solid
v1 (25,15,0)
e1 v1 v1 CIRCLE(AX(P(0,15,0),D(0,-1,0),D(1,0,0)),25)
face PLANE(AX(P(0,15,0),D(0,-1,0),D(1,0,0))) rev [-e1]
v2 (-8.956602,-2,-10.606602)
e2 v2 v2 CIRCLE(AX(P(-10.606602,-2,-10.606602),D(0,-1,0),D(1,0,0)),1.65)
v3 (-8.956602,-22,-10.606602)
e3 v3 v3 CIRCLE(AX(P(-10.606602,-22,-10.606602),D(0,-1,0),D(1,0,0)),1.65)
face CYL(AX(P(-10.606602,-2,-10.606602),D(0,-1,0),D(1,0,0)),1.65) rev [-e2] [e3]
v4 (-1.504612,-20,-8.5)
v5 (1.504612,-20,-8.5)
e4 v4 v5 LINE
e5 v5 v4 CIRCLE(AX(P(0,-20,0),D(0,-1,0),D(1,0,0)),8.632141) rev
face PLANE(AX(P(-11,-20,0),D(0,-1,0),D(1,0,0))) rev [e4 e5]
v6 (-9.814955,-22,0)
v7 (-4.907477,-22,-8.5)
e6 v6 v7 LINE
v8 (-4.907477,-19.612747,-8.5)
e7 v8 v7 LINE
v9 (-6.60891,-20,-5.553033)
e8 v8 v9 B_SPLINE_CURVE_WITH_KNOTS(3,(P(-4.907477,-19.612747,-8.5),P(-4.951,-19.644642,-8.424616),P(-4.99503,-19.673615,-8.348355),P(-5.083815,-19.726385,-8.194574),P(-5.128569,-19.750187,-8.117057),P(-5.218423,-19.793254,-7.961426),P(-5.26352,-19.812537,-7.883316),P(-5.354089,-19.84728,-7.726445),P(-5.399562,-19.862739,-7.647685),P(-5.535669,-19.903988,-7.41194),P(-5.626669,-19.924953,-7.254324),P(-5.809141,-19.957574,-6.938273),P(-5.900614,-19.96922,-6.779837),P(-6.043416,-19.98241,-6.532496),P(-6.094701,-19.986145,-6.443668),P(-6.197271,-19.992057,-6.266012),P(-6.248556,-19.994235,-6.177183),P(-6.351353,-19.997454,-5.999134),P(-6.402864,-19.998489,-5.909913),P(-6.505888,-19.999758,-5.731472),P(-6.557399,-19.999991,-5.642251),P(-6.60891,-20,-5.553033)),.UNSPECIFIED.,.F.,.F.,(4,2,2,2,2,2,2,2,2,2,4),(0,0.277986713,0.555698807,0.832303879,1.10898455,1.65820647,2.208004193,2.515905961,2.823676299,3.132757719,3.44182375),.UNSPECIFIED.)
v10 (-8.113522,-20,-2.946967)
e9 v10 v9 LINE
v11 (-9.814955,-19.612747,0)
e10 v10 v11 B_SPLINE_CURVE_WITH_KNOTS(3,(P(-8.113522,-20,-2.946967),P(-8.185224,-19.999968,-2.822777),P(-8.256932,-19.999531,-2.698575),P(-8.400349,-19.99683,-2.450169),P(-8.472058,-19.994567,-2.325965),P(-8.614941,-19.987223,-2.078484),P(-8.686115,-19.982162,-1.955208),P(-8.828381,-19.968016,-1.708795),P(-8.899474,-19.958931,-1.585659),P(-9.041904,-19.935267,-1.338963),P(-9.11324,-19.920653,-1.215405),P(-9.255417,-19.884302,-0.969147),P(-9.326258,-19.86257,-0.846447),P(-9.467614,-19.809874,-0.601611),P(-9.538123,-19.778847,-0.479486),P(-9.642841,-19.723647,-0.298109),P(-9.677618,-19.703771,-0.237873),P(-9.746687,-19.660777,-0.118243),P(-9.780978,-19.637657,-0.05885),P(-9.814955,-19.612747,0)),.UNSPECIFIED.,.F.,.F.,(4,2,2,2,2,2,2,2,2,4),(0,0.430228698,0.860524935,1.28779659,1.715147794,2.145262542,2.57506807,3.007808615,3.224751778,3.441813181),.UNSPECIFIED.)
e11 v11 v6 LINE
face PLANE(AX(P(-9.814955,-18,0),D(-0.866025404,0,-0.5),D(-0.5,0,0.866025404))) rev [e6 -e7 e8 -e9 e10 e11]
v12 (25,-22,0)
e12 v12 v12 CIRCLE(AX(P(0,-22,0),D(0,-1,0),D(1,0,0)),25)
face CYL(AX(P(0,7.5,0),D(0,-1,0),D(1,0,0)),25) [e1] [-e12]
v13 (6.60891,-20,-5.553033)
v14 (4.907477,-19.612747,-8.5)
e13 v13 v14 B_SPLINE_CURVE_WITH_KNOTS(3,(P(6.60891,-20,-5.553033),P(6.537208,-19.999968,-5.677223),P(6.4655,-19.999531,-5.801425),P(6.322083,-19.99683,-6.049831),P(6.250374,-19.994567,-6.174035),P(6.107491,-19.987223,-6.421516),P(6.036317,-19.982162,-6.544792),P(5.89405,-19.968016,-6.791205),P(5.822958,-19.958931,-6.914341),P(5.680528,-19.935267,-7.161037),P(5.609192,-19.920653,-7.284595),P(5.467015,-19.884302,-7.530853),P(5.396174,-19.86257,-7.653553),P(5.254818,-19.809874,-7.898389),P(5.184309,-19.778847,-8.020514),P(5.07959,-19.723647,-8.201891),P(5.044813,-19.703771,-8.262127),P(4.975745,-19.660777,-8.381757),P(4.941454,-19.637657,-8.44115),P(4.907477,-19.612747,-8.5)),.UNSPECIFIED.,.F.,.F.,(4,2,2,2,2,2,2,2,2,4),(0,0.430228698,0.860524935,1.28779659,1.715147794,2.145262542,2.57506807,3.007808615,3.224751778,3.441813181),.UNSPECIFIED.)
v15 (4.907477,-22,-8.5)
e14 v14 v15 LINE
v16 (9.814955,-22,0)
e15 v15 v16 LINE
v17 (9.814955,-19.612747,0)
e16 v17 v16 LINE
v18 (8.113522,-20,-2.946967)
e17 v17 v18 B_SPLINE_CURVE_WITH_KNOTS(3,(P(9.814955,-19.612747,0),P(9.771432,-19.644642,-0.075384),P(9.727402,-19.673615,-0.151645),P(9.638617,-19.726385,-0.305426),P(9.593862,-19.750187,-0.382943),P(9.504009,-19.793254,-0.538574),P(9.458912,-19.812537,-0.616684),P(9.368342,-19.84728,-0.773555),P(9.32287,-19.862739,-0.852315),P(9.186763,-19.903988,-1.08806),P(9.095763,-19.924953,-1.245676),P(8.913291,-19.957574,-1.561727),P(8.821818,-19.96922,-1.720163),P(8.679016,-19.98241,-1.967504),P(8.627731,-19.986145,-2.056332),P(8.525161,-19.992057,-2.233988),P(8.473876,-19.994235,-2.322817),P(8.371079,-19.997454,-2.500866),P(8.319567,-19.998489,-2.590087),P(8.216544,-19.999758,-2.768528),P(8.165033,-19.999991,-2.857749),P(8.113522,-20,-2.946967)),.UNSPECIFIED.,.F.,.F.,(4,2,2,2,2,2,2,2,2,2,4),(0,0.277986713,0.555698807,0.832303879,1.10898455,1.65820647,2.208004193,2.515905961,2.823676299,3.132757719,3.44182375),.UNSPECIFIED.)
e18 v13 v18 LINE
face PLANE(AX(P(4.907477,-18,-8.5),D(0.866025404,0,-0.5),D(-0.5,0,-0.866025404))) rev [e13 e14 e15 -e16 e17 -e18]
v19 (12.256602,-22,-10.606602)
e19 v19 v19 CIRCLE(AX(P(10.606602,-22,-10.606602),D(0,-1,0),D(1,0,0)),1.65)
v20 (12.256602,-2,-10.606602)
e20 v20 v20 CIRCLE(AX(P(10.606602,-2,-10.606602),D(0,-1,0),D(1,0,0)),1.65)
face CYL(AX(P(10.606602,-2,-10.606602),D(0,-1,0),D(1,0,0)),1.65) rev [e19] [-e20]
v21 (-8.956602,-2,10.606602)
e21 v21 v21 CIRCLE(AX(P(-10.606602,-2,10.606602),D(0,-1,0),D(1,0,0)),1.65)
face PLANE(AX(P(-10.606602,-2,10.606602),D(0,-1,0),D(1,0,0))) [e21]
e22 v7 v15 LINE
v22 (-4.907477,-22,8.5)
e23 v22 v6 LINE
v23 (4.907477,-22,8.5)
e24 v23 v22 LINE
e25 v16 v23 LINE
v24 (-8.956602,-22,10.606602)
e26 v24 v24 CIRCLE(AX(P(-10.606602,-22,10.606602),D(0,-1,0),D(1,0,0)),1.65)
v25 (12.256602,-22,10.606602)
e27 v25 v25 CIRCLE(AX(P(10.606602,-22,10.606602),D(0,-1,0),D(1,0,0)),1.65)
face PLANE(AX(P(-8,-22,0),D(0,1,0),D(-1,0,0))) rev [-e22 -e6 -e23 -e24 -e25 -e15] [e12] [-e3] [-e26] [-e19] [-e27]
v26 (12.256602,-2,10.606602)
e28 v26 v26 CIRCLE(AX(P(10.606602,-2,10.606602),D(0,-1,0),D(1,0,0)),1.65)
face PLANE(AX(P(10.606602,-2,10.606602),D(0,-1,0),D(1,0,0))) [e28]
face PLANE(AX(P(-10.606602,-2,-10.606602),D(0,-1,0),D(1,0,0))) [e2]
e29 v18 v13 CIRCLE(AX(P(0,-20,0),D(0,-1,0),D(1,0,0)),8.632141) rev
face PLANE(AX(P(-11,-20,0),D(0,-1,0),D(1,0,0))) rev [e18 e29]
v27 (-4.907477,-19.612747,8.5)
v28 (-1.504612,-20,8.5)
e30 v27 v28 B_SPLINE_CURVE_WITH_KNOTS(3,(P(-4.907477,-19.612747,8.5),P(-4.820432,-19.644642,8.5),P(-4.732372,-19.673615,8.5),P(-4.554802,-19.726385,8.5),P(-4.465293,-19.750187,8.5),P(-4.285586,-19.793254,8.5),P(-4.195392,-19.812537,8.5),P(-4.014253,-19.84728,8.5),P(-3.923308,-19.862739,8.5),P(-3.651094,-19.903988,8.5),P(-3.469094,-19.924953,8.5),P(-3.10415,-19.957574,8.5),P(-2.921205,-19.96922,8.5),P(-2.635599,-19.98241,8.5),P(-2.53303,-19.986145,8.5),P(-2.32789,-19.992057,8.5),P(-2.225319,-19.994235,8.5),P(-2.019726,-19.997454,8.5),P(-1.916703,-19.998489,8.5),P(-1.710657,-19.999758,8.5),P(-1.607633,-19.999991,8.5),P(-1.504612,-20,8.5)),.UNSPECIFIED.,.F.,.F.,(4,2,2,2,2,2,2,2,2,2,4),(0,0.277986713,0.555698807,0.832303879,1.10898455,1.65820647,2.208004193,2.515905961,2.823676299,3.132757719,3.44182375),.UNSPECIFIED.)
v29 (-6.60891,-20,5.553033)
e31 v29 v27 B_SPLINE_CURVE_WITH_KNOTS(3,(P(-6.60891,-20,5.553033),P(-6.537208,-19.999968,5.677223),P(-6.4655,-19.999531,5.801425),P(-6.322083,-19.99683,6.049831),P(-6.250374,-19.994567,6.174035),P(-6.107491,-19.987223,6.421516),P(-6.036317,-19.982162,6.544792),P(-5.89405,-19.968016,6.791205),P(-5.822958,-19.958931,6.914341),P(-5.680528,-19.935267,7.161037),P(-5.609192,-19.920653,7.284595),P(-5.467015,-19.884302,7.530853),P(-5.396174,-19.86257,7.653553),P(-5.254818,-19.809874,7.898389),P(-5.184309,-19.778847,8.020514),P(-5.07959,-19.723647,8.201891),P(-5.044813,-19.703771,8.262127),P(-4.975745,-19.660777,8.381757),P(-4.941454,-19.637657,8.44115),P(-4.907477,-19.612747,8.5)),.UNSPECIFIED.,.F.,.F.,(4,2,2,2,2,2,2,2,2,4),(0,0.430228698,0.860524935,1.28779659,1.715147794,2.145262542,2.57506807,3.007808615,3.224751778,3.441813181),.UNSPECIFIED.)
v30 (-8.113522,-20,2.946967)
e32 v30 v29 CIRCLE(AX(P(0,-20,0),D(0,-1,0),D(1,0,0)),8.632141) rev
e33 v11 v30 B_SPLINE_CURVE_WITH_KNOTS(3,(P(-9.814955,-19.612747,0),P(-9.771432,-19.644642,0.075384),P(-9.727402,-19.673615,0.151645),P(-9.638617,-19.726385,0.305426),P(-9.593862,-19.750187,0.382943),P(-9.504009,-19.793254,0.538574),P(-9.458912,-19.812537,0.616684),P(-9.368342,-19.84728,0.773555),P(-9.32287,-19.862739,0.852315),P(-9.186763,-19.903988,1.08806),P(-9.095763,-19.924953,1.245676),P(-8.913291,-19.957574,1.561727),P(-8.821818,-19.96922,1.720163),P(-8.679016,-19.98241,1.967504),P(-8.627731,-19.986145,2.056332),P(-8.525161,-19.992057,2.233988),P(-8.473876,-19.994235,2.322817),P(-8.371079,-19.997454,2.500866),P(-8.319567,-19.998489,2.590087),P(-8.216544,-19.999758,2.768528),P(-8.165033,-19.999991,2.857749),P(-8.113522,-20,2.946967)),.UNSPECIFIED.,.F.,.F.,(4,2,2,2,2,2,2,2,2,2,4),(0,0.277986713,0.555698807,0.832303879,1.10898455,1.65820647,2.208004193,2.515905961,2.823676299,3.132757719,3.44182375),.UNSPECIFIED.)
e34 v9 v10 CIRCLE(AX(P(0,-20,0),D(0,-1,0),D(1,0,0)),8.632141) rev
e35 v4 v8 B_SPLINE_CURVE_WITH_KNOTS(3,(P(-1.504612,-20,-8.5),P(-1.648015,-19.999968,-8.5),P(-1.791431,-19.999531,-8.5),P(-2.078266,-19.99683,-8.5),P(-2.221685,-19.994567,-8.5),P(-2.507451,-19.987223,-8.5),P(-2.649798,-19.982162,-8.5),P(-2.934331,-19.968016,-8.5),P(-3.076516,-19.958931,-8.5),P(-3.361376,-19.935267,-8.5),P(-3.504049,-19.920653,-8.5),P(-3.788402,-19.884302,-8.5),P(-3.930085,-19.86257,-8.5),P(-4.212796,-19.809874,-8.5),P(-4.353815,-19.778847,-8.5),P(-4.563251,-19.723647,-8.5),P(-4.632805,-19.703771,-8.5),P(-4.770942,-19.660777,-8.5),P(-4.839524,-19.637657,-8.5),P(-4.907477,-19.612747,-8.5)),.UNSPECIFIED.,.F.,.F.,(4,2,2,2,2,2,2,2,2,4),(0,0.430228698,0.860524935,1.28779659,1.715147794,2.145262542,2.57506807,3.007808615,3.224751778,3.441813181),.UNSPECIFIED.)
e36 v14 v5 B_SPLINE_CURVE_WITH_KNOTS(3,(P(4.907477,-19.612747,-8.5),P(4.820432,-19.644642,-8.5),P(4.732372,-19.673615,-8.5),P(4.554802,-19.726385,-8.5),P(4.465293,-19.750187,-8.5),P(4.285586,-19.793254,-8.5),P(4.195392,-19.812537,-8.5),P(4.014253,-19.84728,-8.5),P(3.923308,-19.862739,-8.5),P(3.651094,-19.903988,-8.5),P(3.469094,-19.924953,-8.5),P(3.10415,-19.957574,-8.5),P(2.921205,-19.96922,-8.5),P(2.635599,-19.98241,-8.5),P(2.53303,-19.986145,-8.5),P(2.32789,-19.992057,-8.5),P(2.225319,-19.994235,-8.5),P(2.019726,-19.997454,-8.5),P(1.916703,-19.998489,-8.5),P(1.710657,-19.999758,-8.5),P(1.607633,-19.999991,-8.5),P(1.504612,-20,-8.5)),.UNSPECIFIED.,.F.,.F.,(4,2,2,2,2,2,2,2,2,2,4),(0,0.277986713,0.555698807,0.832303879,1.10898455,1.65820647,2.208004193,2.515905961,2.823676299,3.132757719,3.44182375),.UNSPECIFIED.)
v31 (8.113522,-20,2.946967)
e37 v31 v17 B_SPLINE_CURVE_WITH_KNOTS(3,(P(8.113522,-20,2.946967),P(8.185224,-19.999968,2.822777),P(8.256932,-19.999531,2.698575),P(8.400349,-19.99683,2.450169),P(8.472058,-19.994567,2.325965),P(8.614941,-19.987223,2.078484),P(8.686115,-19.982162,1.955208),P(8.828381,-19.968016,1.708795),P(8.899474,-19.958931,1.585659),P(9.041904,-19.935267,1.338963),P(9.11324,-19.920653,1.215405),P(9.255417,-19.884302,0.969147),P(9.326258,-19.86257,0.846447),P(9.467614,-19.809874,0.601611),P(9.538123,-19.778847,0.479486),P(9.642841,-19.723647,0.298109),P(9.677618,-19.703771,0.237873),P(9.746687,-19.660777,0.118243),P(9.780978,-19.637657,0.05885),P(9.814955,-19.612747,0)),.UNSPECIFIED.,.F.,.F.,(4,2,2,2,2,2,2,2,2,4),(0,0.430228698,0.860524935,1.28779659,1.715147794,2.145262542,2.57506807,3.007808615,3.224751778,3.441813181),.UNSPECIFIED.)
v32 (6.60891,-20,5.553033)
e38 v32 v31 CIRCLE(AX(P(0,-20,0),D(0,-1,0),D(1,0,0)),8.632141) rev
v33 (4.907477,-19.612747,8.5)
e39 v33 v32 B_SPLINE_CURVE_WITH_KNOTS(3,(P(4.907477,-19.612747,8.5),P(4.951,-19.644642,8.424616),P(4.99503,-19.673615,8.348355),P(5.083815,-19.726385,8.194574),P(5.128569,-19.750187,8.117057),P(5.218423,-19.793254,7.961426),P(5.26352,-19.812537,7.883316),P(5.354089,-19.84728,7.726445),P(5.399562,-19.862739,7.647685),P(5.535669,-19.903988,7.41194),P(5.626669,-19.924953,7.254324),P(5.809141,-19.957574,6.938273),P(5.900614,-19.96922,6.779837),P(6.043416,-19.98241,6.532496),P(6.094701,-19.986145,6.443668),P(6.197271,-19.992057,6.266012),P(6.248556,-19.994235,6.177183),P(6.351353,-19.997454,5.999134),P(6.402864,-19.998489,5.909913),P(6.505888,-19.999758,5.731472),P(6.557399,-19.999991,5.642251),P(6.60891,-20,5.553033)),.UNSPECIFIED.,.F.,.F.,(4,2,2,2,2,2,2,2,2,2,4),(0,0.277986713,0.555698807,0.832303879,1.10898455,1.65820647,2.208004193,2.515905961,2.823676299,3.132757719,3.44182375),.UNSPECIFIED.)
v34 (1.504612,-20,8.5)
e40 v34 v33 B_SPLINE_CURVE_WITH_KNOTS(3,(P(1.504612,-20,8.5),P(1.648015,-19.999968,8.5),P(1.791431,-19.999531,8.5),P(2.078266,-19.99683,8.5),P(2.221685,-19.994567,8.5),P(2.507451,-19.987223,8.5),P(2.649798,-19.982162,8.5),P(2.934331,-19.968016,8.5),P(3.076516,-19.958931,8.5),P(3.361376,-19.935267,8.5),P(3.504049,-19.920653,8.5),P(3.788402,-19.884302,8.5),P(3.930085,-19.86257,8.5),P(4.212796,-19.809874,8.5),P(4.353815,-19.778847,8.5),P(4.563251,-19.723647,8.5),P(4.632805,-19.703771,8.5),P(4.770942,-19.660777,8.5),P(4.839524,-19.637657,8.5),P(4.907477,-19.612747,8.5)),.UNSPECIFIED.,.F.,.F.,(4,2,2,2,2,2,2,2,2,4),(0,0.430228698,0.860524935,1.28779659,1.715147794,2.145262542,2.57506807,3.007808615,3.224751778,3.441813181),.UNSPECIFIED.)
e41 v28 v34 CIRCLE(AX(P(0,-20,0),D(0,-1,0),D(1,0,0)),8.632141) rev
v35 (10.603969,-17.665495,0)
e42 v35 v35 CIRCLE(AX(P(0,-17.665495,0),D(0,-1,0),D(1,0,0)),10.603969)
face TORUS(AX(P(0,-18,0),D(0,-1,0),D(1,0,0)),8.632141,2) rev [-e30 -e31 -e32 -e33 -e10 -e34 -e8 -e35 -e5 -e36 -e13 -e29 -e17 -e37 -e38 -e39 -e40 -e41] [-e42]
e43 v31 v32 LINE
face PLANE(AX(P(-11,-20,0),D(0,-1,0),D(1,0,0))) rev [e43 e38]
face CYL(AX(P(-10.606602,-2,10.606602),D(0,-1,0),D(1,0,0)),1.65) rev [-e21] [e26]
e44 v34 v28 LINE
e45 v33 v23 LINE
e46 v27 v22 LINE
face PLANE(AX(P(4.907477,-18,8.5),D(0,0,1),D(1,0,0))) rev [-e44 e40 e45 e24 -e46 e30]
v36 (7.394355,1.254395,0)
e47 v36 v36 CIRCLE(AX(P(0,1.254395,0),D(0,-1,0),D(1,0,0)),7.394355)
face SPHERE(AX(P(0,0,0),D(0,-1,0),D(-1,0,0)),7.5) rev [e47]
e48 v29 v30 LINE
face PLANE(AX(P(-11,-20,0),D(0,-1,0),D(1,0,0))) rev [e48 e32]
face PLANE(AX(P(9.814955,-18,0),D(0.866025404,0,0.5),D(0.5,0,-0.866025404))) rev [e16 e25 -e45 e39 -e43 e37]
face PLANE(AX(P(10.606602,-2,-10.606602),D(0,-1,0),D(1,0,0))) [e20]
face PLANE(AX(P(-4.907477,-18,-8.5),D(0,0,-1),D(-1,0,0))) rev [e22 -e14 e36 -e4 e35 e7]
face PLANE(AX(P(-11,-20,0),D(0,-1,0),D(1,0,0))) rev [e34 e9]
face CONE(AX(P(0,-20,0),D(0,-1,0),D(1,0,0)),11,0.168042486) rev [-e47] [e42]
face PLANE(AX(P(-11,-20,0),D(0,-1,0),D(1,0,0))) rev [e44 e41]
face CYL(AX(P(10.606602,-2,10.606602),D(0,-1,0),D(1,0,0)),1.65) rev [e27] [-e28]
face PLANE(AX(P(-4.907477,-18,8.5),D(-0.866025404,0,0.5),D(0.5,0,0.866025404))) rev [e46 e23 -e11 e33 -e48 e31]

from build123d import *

# Parameters (mm, degrees)
ENL_V_MAT_EXTRU_1_DEPTH = 4
CONG_1_R                = 2
ESQUISSE3_R             = 1.65
ENL_V_MAT_EXTRU_2_DEPTH = 20


with BuildPart() as part:
    # Esquisse1 → Révolution2 (revolve)
    with BuildSketch(Plane.XY, mode=Mode.PRIVATE) as r_volution2_sk:
        with BuildLine():
            Line((-7.394355414, 1.254395478), (-11, -20))
            Line((-11, -20), (-8, -20))
            Line((-8, -20), (-8, -22))
            Line((-8, -22), (-25, -22))
            Line((-25, -22), (-25, -20))
            Line((-25, -20), (-25, 15))
            Line((-25, 15), (0, 15))
            Line((0, 15), (0, 7.5))
            ThreePointArc((0, 7.5), (-4.839526522, 5.729658196), (-7.394355414, 1.254395478))
        make_face()
    revolve(r_volution2_sk.sketch.rotate(Axis((0, 7.5, 0), (0, 1, 0)), 180), axis=Axis((0, 7.5, 0), (0, 1, 0)))

    # Esquisse2 → Enlèv. mat.-Extru.1 (cut)
    with BuildSketch(Plane.XZ.offset(22)):
        Polygon((9.814954576, 0), (4.907477288, 8.5), (-4.907477288, 8.5), (-9.814954576, 0), (-4.907477288, -8.5), (4.907477288, -8.5), align=None)
    extrude(amount=-ENL_V_MAT_EXTRU_1_DEPTH, mode=Mode.SUBTRACT)

    # Congé1
    # the kernel refuses this fillet: 2 mm, written as the material it adds along each edge
    with BuildSketch(Plane(origin=(0, -20, 0), x_dir=(1, 0, 0), z_dir=(0, 0, 1))) as cong_1_piece_1_section:
        with BuildLine():
            CenterArc((11 - CONG_1_R * 1.1839294959, CONG_1_R), CONG_1_R, 270, 99.628125236)
            Line((11 - CONG_1_R * 1.1839294959, 0), (11, 0))
            Line((11, 0), (11 - CONG_1_R * 0.198015440727, CONG_1_R * 1.16725273035))
        make_face()
    cong_1_piece_1 = revolve(axis=Axis((0, -20, 0), (0, 1, 0)), mode=Mode.PRIVATE)
    cong_1_piece_1 = split(cong_1_piece_1, bisect_by=Plane(origin=(10.002736097, -19.349469748, 0.325247134), z_dir=(0.8660254037844389, 0, -0.49999999999999956)), keep=Keep.TOP, mode=Mode.PRIVATE)
    with BuildSketch(Plane(origin=(0, -20, 0), x_dir=(1, 0, 0), z_dir=(0, 0, 1))) as cong_1_piece_2_section:
        with BuildLine():
            CenterArc((11 - CONG_1_R * 1.1839294959, CONG_1_R), CONG_1_R, 270, 99.628125236)
            Line((11 - CONG_1_R * 1.1839294959, 0), (11, 0))
            Line((11, 0), (11 - CONG_1_R * 0.198015440727, CONG_1_R * 1.16725273035))
        make_face()
    cong_1_piece_2 = revolve(axis=Axis((0, -20, 0), (0, 1, 0)), mode=Mode.PRIVATE)
    cong_1_piece_2 = split(cong_1_piece_2, bisect_by=Plane(origin=(7.361215688, -19.472047685, 4.250000423), z_dir=(0.8660254037844387, 0, 0.5000000000000003)), keep=Keep.TOP, mode=Mode.PRIVATE)
    with BuildSketch(Plane(origin=(0, -20, 0), x_dir=(1, 0, 0), z_dir=(0, 0, 1))) as cong_1_piece_3_section:
        with BuildLine():
            CenterArc((11 - CONG_1_R * 1.1839294959, CONG_1_R), CONG_1_R, 270, 99.628125236)
            Line((11 - CONG_1_R * 1.1839294959, 0), (11, 0))
            Line((11, 0), (11 - CONG_1_R * 0.198015440727, CONG_1_R * 1.16725273035))
        make_face()
    cong_1_piece_3 = revolve(axis=Axis((0, -20, 0), (0, 1, 0)), mode=Mode.PRIVATE)
    cong_1_piece_3 = split(cong_1_piece_3, bisect_by=Plane(origin=(-2.9e-08, -19.472047136, -8.5), z_dir=(0, 0, -1)), keep=Keep.TOP, mode=Mode.PRIVATE)
    with BuildSketch(Plane(origin=(0, -20, 0), x_dir=(1, 0, 0), z_dir=(0, 0, 1))) as cong_1_piece_4_section:
        with BuildLine():
            CenterArc((11 - CONG_1_R * 1.1839294959, CONG_1_R), CONG_1_R, 270, 99.628125236)
            Line((11 - CONG_1_R * 1.1839294959, 0), (11, 0))
            Line((11, 0), (11 - CONG_1_R * 0.198015440727, CONG_1_R * 1.16725273035))
        make_face()
    cong_1_piece_4 = revolve(axis=Axis((0, -20, 0), (0, 1, 0)), mode=Mode.PRIVATE)
    cong_1_piece_4 = split(cong_1_piece_4, bisect_by=Plane(origin=(2.9e-08, -19.472047136, 8.5), z_dir=(0, 0, 1)), keep=Keep.TOP, mode=Mode.PRIVATE)
    with BuildSketch(Plane(origin=(0, -20, 0), x_dir=(1, 0, 0), z_dir=(0, 0, 1))) as cong_1_piece_5_section:
        with BuildLine():
            CenterArc((11 - CONG_1_R * 1.1839294959, CONG_1_R), CONG_1_R, 270, 99.628125236)
            Line((11 - CONG_1_R * 1.1839294959, 0), (11, 0))
            Line((11, 0), (11 - CONG_1_R * 0.198015440727, CONG_1_R * 1.16725273035))
        make_face()
    cong_1_piece_5 = revolve(axis=Axis((0, -20, 0), (0, 1, 0)), mode=Mode.PRIVATE)
    cong_1_piece_5 = split(cong_1_piece_5, bisect_by=Plane(origin=(-7.361215946, -19.472047136, -4.249999975), z_dir=(-0.8660254037844387, 0, -0.5000000000000001)), keep=Keep.TOP, mode=Mode.PRIVATE)
    with BuildSketch(Plane(origin=(0, -20, 0), x_dir=(1, 0, 0), z_dir=(0, 0, 1))) as cong_1_piece_6_section:
        with BuildLine():
            CenterArc((11 - CONG_1_R * 1.1839294959, CONG_1_R), CONG_1_R, 270, 99.628125236)
            Line((11 - CONG_1_R * 1.1839294959, 0), (11, 0))
            Line((11, 0), (11 - CONG_1_R * 0.198015440727, CONG_1_R * 1.16725273035))
        make_face()
    cong_1_piece_6 = revolve(axis=Axis((0, -20, 0), (0, 1, 0)), mode=Mode.PRIVATE)
    cong_1_piece_6 = split(cong_1_piece_6, bisect_by=Plane(origin=(-7.361215918, -19.472047136, 4.250000025), z_dir=(-0.8660254037844387, 0, 0.4999999999999999)), keep=Keep.TOP, mode=Mode.PRIVATE)
    add([cong_1_piece_1, cong_1_piece_2, cong_1_piece_3, cong_1_piece_4, cong_1_piece_5, cong_1_piece_6])

    # Esquisse3 → Enlèv. mat.-Extru.2 (cut)
    with BuildSketch(Plane.XZ.offset(22)):
        with Locations((10.606601718, -10.606601718)):
            Circle(ESQUISSE3_R)
        with Locations((-10.606601718, -10.606601718)):
            Circle(ESQUISSE3_R)
        with Locations((-10.606601718, 10.606601718)):
            Circle(ESQUISSE3_R)
        with Locations((10.606601718, 10.606601718)):
            Circle(ESQUISSE3_R)
    extrude(amount=-ENL_V_MAT_EXTRU_2_DEPTH, mode=Mode.SUBTRACT)


solid = part.part
